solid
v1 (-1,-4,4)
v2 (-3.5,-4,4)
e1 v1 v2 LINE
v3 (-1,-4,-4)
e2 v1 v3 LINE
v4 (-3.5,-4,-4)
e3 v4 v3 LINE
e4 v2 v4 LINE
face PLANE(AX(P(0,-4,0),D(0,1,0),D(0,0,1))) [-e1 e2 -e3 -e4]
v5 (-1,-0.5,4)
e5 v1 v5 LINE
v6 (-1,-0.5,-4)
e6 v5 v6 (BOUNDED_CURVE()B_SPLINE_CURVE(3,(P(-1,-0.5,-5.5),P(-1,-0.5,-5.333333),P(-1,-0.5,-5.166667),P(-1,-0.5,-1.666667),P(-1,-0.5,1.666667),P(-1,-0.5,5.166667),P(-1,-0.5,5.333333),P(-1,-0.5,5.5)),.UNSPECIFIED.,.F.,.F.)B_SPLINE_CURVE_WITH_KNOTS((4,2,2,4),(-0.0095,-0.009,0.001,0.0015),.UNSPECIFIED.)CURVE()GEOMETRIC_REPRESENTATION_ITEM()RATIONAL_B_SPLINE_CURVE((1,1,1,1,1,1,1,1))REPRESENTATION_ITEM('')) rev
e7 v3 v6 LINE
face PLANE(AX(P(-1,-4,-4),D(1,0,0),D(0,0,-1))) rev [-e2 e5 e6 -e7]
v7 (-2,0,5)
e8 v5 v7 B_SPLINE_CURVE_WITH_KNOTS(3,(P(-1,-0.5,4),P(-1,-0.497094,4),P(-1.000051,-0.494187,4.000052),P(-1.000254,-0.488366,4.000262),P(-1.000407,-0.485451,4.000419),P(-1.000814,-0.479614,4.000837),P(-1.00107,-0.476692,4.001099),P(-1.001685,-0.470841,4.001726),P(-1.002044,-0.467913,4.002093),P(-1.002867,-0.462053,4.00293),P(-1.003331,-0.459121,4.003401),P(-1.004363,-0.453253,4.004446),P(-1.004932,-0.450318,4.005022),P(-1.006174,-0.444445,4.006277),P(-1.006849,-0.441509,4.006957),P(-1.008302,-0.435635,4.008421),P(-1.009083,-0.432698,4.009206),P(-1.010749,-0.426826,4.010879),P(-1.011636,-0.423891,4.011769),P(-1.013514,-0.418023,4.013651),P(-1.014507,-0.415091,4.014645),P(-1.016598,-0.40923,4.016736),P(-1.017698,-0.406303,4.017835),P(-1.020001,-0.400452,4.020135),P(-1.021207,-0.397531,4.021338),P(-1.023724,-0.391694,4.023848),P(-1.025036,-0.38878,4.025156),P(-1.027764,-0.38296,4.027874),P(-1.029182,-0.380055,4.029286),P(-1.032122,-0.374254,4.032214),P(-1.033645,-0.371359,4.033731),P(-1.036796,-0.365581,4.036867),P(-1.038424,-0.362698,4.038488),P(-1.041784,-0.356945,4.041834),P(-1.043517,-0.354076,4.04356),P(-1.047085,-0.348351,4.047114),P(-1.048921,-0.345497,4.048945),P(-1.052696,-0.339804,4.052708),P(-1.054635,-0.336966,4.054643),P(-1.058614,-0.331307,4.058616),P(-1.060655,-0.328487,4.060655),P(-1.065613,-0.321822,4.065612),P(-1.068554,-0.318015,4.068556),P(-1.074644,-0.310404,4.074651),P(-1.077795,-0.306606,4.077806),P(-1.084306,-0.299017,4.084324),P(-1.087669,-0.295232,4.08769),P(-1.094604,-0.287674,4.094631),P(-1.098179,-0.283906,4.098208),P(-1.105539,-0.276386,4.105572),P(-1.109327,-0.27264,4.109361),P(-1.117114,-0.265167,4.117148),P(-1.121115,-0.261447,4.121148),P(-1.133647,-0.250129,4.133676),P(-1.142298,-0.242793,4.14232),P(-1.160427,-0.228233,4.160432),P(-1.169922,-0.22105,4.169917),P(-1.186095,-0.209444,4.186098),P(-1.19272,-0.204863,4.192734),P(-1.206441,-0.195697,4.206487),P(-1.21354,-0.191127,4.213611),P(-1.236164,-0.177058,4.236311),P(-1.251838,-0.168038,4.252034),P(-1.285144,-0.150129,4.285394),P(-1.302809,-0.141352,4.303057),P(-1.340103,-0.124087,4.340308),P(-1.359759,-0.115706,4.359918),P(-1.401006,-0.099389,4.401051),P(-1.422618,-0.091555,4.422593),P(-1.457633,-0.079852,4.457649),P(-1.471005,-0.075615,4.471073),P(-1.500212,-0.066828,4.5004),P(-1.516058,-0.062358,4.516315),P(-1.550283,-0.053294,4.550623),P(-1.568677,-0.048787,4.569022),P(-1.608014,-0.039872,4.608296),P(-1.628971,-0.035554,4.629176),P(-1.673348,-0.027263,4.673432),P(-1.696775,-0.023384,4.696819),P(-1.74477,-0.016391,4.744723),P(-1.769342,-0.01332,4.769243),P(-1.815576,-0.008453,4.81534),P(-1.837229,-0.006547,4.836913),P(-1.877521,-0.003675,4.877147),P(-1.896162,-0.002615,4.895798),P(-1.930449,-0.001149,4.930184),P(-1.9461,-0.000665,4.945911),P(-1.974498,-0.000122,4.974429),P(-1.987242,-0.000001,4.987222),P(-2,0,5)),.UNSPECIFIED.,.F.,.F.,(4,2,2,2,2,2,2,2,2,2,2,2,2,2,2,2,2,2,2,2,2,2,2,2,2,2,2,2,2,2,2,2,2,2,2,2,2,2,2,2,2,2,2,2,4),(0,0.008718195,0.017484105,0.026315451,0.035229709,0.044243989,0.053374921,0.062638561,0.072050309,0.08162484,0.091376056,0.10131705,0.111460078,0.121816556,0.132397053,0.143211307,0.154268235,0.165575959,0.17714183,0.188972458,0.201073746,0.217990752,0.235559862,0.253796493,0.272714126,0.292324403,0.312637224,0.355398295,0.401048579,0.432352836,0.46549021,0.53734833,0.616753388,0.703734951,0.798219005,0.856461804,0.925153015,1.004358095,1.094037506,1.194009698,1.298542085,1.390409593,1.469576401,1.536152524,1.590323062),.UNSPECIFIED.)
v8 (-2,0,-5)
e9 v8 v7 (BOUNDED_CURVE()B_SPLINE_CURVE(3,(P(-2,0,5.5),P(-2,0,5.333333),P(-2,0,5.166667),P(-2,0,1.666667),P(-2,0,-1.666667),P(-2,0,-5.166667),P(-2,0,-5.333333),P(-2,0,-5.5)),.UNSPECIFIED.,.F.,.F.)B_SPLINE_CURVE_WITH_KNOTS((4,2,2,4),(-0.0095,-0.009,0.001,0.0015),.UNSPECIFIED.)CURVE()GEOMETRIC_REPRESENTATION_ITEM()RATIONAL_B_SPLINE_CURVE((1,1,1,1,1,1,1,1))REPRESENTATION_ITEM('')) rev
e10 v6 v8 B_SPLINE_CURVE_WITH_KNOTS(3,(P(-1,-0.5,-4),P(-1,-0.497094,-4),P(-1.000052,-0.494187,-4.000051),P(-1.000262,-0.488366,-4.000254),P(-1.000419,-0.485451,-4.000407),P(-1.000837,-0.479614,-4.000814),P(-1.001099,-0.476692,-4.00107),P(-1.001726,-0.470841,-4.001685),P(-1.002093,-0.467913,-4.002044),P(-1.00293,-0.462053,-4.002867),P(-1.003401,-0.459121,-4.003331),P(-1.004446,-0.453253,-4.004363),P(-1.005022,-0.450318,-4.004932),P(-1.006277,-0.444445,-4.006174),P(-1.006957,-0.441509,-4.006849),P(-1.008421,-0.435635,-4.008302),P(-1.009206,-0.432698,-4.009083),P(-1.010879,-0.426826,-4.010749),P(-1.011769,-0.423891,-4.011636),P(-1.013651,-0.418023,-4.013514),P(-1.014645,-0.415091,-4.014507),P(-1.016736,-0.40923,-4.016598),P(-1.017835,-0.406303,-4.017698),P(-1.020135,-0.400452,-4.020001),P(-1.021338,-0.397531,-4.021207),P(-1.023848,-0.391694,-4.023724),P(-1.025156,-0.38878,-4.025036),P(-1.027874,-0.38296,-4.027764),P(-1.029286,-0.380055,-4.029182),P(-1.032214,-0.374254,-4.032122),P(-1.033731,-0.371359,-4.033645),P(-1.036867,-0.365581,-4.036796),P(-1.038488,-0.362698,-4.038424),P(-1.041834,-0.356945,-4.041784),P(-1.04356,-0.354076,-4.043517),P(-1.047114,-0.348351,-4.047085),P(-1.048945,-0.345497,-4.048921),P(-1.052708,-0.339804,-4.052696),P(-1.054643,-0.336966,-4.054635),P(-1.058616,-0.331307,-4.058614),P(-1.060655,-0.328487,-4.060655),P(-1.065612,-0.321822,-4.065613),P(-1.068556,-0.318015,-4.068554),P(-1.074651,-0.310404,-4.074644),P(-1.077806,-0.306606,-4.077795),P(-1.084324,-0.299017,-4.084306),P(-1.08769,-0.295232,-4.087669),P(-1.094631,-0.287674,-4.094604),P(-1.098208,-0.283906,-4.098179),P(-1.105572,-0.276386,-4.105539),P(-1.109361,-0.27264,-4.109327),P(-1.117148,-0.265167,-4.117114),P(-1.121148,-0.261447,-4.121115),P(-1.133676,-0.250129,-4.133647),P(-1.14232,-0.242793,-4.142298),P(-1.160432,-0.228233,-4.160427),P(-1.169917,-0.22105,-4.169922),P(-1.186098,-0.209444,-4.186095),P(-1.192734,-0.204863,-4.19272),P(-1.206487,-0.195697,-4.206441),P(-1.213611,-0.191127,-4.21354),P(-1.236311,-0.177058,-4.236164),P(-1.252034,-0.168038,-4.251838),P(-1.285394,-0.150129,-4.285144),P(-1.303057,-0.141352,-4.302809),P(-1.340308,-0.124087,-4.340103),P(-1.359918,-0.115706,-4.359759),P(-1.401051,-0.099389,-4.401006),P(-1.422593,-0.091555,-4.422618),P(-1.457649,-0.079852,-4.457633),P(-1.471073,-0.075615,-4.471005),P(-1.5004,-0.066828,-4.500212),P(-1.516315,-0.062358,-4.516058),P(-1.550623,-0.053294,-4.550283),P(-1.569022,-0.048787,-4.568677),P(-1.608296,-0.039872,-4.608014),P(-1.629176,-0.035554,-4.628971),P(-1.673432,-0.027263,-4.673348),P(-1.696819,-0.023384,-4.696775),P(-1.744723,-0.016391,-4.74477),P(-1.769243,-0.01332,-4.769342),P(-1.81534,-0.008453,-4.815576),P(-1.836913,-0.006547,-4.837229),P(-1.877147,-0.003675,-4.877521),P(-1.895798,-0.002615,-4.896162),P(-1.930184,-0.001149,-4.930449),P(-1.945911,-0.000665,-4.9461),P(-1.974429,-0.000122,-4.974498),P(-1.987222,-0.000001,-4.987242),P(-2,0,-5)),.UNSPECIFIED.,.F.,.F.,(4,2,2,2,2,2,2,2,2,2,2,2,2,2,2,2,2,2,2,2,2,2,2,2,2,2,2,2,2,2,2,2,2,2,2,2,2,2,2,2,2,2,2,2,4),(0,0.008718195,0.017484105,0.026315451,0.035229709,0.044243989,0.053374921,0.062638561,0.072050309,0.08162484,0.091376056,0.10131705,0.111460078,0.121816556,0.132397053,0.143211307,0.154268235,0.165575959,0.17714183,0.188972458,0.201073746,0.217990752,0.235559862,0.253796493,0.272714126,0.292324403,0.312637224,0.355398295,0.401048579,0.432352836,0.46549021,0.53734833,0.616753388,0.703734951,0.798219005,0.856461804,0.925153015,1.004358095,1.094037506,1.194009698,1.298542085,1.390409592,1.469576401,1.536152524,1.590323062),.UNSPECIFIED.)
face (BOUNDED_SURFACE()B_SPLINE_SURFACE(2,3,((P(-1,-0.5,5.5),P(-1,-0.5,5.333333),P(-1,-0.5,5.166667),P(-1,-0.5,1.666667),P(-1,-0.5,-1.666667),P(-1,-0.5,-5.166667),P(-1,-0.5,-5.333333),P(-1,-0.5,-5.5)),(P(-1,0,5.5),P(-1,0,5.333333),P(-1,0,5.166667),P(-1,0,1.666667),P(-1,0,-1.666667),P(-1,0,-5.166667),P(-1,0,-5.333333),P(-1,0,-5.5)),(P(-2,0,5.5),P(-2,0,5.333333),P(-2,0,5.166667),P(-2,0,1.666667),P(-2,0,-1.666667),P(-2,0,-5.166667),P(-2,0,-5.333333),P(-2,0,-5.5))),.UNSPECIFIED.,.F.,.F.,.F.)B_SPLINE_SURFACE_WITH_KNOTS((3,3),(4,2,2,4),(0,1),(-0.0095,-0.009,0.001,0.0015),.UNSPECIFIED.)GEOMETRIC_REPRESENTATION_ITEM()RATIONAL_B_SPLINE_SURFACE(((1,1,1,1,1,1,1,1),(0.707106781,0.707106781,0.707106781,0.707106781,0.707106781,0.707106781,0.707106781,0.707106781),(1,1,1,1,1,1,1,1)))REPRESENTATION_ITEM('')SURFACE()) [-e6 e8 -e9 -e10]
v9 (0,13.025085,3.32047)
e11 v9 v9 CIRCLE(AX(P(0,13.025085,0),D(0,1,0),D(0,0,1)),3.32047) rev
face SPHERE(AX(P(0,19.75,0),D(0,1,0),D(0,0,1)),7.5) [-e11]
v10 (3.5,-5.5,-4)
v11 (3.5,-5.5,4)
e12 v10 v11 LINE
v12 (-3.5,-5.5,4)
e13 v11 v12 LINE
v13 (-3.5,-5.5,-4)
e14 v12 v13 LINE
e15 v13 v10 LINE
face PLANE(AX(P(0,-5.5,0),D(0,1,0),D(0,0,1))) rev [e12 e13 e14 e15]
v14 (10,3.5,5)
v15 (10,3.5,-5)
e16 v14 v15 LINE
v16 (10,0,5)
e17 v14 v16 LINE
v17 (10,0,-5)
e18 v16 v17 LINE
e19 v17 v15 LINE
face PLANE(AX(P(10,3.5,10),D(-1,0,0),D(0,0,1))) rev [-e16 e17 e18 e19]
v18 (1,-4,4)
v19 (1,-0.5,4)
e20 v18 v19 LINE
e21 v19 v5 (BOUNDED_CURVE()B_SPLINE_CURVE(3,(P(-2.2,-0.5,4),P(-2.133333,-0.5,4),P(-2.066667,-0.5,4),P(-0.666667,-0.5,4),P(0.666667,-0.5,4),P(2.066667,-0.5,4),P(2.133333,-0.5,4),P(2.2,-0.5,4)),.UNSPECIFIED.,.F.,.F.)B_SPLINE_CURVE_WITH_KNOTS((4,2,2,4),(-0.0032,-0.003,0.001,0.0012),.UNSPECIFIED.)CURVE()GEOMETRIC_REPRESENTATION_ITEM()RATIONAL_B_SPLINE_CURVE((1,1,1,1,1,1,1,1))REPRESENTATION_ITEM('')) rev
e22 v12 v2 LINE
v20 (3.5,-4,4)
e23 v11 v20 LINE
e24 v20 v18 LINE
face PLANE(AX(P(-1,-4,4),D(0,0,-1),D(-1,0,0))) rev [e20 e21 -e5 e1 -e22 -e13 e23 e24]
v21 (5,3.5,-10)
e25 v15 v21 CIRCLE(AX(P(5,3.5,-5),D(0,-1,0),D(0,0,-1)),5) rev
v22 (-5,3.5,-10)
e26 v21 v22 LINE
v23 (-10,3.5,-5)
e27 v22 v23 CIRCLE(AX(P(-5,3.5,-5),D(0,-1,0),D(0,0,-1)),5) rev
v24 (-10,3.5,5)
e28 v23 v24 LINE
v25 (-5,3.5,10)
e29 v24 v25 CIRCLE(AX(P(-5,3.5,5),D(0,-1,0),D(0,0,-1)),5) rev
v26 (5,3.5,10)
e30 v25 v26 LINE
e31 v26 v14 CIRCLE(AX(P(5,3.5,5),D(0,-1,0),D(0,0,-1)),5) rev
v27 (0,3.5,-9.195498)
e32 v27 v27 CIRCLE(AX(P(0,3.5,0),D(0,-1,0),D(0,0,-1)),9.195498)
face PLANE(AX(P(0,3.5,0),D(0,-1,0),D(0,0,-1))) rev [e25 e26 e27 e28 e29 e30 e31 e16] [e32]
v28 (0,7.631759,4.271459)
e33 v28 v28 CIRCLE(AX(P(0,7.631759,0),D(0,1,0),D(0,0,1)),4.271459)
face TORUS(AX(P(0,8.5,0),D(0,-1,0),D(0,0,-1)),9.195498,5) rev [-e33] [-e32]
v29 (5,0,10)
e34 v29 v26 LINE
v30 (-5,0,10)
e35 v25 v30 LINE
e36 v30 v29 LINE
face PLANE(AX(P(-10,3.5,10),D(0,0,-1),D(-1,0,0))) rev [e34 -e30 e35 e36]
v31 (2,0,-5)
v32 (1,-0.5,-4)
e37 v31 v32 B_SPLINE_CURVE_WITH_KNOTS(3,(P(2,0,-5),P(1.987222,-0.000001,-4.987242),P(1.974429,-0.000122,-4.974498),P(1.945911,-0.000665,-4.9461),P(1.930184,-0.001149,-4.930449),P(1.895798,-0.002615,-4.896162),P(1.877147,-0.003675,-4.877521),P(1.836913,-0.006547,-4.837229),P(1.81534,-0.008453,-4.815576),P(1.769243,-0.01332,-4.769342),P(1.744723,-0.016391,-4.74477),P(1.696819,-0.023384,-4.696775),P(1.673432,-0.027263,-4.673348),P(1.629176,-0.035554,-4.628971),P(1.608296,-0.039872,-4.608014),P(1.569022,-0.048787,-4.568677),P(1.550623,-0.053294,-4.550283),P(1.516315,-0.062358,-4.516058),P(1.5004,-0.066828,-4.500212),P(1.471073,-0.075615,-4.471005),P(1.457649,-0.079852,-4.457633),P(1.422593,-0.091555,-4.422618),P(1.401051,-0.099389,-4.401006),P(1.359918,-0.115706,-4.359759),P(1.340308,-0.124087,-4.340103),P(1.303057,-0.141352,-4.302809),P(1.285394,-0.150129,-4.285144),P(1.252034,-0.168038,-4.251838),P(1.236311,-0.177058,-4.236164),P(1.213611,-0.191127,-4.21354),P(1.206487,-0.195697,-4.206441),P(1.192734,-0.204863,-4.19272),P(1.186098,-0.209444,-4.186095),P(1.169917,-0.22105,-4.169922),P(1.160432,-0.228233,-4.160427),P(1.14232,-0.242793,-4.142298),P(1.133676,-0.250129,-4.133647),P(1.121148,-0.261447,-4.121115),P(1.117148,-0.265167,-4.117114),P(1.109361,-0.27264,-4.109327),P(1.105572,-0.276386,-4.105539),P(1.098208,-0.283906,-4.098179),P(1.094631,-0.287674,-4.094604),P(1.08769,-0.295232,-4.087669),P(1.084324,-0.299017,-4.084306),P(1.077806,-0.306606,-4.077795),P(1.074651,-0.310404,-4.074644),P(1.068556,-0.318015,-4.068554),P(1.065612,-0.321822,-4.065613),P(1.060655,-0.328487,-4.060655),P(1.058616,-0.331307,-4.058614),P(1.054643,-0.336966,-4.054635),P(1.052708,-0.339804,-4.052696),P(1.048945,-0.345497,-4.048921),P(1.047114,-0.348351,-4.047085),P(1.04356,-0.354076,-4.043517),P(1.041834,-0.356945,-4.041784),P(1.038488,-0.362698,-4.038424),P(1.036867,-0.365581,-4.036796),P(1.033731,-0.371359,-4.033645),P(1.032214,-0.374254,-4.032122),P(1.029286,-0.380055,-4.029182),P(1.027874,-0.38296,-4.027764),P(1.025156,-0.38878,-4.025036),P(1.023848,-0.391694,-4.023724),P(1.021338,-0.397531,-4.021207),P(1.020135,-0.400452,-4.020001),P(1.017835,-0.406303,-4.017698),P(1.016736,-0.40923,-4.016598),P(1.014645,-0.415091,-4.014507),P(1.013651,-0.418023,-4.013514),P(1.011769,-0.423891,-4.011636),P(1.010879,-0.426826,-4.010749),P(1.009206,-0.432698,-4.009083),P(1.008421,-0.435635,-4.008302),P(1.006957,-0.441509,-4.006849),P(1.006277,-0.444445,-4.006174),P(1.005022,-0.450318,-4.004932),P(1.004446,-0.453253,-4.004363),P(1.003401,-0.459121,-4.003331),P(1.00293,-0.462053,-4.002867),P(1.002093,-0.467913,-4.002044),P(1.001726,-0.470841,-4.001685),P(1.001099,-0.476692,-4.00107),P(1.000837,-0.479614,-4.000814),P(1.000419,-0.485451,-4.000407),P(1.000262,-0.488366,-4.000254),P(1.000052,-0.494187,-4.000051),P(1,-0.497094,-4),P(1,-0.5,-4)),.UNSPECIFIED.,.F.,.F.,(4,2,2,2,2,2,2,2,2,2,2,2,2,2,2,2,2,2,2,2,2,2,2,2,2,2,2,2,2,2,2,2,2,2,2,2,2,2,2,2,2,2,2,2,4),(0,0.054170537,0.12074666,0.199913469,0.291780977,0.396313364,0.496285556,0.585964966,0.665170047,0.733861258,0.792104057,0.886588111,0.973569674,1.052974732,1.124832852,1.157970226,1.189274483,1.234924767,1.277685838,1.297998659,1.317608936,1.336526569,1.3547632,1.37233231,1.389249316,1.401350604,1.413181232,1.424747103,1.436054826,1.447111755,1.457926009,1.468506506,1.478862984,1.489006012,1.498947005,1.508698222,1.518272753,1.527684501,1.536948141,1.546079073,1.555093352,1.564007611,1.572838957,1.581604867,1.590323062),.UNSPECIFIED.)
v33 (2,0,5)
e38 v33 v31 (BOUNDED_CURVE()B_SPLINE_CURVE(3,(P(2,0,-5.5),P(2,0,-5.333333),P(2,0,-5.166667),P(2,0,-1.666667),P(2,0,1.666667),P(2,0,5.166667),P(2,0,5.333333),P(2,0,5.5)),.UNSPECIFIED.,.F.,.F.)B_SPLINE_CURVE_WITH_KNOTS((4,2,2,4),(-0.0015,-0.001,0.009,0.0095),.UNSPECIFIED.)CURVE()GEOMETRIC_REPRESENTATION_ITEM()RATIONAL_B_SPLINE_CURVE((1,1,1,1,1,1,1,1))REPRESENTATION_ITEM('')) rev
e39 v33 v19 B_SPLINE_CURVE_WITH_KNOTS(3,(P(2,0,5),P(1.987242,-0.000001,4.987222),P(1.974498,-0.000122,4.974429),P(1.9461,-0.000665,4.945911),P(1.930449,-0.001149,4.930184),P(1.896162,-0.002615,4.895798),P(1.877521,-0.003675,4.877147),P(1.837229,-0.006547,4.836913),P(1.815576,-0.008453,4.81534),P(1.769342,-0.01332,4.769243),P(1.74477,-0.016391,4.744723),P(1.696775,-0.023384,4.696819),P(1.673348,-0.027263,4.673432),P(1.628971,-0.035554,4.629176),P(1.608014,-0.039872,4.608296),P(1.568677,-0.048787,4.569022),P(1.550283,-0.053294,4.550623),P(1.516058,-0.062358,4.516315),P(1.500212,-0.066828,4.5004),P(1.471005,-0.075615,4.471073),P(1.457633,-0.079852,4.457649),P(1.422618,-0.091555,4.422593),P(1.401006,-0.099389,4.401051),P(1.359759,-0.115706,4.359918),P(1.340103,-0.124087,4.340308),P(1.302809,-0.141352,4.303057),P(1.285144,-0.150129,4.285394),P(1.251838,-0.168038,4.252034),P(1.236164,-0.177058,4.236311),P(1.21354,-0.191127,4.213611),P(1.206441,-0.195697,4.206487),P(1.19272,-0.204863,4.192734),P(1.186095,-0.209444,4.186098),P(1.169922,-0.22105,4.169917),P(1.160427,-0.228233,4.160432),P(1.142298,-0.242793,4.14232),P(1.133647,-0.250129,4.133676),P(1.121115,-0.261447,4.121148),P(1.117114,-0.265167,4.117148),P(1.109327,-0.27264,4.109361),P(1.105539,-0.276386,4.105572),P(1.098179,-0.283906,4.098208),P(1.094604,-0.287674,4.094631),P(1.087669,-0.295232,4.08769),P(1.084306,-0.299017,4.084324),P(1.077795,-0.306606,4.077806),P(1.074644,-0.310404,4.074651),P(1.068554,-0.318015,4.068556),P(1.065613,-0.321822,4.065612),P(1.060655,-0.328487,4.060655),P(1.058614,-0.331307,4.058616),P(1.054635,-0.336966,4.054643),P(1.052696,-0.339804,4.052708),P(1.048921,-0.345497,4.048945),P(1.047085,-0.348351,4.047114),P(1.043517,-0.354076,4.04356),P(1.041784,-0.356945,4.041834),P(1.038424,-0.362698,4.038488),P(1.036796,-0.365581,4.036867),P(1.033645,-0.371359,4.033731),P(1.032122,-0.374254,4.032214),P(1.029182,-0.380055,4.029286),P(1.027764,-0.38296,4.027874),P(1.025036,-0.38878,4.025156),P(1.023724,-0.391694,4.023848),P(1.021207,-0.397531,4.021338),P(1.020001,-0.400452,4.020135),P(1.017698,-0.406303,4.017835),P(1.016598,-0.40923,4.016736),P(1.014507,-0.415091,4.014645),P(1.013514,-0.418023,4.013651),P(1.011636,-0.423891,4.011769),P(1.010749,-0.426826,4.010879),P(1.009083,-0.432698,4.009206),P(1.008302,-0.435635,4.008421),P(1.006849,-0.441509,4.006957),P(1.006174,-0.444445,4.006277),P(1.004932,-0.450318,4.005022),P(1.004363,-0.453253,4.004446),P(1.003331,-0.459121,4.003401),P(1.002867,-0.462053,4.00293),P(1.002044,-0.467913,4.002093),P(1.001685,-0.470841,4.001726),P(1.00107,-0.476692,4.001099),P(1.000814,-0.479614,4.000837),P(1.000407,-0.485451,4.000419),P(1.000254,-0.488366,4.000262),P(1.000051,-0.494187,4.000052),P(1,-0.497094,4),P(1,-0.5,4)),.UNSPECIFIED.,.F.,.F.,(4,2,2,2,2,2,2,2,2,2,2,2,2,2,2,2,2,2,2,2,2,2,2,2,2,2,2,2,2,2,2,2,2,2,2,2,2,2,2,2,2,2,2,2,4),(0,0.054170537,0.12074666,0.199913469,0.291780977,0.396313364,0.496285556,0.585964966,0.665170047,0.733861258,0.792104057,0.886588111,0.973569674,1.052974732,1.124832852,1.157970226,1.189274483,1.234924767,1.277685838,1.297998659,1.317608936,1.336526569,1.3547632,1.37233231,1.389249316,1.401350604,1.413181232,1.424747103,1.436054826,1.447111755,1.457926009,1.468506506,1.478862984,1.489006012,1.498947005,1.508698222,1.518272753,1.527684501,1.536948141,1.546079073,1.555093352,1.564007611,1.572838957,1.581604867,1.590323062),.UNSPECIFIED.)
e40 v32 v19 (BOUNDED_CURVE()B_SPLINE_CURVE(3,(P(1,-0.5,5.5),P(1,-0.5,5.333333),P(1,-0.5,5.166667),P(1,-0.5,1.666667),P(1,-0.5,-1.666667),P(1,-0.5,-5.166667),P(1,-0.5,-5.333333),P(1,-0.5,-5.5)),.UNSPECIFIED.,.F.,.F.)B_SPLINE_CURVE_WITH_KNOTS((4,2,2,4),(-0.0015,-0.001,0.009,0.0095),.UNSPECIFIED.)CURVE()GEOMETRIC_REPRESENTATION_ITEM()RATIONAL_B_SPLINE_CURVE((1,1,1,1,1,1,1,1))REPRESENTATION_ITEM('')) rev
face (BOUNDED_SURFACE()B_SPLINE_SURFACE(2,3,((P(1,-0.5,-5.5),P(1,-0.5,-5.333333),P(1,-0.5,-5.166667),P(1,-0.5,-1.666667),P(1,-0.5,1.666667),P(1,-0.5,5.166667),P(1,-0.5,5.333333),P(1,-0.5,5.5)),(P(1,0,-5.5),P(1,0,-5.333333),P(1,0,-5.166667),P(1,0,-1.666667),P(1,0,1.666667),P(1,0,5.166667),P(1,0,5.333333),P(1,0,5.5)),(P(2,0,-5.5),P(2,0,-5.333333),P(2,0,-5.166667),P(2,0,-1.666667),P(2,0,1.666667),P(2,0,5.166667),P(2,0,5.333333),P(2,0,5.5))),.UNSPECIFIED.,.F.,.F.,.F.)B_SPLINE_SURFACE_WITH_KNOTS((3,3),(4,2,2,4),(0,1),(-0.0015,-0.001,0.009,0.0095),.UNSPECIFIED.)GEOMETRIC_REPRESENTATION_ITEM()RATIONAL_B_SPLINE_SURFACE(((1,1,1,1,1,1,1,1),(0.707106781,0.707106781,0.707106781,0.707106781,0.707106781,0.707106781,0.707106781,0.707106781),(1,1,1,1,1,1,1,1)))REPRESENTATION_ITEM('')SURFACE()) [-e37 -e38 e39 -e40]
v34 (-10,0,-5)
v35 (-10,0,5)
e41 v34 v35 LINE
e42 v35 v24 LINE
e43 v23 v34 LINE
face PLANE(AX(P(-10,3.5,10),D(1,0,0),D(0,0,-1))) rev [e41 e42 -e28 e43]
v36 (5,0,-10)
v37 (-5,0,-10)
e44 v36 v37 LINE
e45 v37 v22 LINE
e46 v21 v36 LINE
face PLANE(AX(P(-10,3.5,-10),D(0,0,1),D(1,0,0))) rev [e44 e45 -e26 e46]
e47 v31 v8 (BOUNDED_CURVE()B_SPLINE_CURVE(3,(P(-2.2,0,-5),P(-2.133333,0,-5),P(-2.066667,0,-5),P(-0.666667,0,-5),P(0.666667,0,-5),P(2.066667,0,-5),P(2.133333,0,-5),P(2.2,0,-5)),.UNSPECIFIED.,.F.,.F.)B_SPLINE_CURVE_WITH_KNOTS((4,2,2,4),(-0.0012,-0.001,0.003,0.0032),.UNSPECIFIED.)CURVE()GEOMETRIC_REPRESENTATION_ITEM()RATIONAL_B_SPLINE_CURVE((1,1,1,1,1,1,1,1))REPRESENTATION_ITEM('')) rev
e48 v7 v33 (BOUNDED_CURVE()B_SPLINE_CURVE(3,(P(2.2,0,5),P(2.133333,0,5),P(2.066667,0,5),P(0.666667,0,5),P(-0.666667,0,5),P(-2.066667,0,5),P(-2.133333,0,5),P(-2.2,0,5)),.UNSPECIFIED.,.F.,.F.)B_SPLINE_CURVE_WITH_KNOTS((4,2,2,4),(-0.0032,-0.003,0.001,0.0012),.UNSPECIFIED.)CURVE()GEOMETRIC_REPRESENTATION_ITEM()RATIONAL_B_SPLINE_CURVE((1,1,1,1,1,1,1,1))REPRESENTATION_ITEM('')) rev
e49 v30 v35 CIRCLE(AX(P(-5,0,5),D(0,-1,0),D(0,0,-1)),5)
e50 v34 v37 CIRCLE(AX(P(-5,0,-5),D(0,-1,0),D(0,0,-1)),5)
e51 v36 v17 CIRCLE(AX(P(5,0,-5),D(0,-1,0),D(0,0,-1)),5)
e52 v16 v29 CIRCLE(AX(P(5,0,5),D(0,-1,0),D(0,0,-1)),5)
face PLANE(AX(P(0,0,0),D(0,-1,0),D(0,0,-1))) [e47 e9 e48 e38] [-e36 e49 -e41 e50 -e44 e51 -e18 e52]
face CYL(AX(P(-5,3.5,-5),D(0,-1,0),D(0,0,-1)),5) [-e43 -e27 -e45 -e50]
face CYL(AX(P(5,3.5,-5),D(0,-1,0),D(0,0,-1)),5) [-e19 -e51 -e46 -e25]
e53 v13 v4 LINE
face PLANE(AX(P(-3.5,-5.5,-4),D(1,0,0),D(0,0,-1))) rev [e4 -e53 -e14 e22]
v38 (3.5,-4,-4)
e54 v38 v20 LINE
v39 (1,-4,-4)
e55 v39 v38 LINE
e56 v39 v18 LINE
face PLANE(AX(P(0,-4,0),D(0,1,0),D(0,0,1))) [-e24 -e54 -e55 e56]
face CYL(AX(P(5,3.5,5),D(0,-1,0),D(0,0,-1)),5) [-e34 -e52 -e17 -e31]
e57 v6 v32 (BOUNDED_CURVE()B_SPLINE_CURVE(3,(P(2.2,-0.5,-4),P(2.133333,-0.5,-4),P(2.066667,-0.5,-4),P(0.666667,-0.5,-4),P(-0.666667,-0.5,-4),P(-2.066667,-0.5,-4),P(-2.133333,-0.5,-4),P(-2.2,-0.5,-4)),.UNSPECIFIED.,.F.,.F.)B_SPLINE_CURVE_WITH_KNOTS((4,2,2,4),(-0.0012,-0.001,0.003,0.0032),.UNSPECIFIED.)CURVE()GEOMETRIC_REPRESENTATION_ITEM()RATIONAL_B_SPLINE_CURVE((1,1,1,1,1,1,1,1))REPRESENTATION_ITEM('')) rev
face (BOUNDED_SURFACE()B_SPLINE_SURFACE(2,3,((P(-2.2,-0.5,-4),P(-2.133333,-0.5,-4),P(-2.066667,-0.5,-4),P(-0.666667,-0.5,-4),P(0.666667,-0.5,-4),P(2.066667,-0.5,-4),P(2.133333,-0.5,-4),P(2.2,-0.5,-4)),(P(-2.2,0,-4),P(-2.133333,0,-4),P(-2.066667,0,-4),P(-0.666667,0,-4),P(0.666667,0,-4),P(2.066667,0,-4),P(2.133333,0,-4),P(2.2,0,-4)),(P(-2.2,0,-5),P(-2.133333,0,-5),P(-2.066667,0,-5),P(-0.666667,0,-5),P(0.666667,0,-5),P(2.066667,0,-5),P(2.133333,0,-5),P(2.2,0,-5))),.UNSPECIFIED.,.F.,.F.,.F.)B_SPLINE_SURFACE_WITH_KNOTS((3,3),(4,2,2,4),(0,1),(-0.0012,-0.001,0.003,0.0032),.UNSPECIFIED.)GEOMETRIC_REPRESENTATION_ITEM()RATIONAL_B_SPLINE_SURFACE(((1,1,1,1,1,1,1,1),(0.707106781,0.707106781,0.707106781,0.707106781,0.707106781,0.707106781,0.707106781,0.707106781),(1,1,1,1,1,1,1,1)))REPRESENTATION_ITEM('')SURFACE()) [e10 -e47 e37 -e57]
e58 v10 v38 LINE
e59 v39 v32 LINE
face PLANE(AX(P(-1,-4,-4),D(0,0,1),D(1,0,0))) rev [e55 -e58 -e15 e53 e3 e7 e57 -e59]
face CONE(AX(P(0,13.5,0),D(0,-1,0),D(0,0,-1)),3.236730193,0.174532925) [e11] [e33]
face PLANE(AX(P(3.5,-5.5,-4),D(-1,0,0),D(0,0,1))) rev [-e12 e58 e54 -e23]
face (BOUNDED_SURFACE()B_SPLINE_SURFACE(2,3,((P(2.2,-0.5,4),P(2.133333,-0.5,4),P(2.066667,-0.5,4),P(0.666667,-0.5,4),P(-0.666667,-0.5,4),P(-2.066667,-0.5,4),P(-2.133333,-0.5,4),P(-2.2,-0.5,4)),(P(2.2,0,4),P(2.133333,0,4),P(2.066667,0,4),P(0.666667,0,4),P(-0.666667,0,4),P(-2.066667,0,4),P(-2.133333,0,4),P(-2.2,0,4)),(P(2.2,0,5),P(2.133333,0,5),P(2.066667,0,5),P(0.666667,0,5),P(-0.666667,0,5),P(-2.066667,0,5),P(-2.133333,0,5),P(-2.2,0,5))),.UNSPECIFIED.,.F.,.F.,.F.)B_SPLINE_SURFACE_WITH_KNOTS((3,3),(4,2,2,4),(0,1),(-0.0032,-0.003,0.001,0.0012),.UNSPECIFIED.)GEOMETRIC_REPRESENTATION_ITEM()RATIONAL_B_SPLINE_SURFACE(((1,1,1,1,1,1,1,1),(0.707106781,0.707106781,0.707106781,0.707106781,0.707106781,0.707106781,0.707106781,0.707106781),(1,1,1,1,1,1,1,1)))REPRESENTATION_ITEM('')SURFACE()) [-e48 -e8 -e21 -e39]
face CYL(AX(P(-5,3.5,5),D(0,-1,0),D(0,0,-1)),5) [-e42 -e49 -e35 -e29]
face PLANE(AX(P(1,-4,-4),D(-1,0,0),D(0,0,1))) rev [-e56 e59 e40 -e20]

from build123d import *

# Parameters (mm, degrees)
SKETCH1_W           = 20
SKETCH1_H           = 20
BOSS_EXTRUDE1_DEPTH = 3.5
SKETCH2_R           = 5
BOSS_EXTRUDE2_DEPTH = 10
CHAMFER1_SIZE       = 10
CHAMFER1_SIZE_2     = 1.763269807
FILLET1_R           = 5
FILLET2_R           = 5
SKETCH9_W           = 2
SKETCH9_H           = 8
BOSS_EXTRUDE4_DEPTH = 4
SKETCH10_W          = 7
SKETCH10_H          = 8
BOSS_EXTRUDE5_DEPTH = 1.5
FILLET3_SIZE        = 0.5
FILLET3_SIZE_2      = 1


# Read off the part's stored shape, not the designer's step: Revolve5
with BuildPart() as part:
    # Sketch1 → Boss-Extrude1 (new body)
    with BuildSketch(Plane(origin=(0, 0, 0), x_dir=(1, 0, 0), z_dir=(0, 1, 0))):
        Rectangle(SKETCH1_W, SKETCH1_H)
    extrude(amount=BOSS_EXTRUDE1_DEPTH)

    # Sketch2 → Boss-Extrude2 (add)
    with BuildSketch(Plane(origin=(0, 3.5, 0), x_dir=(1, 0, 0), z_dir=(0, 1, 0))):
        with Locations(Location((0, 0, 0), (0, 0, 270))):
            Circle(SKETCH2_R)
    extrude(amount=BOSS_EXTRUDE2_DEPTH)

    # Chamfer1
    # the kernel refuses this chamfer: 10, 1.763269807 mm, written as the material it takes off along each edge
    with BuildSketch(Plane(origin=(0, 13.5, 0), x_dir=(0, 0, 1), z_dir=(-1, 0, 0))) as chamfer1_piece_1_section:
        Polygon((5, -CHAMFER1_SIZE), (5 - CHAMFER1_SIZE_2, 0), (5, 0), align=None)
    chamfer1_piece_1 = revolve(axis=Axis((0, 13.5, 0), (0, 1, 0)), mode=Mode.PRIVATE)
    chamfer1_piece_1 = split(chamfer1_piece_1, bisect_by=Plane(origin=(0, 3.5, -4.151256053), z_dir=(0, 1, 0)), keep=Keep.TOP, mode=Mode.PRIVATE)
    add(chamfer1_piece_1, mode=Mode.SUBTRACT)

    # Fillet1
    fillet1_edges = [part.edges().sort_by_distance(p)[0] for p in [
        (10, 1.75, 10),
        (-10, 1.75, 10),
        (-10, 1.75, -10),
        (10, 1.75, -10),
    ]]
    fillet(fillet1_edges, radius=FILLET1_R)

    # Revolve5 outline → Revolve5 (revolve)
    with BuildSketch(Plane.XY):
        with BuildLine():
            ThreePointArc((3.320470439, 13.025085423), (7.303658649, 21.454866662), (0, 27.25))
            Line((0, 27.25), (0, 13.5))
            Line((0, 13.5), (3.236730193, 13.5))
            Line((3.236730193, 13.5), (3.236730193, 13.025085423))
            Line((3.236730193, 13.025085423), (3.320470439, 13.025085423))
        make_face()
    revolve(axis=Axis((0, 0, 0), (0, 1, 0)))

    # Fillet2
    fillet2_edges = [part.edges().sort_by_distance(p)[0] for p in [
        (0, 3.5, -5),
    ]]
    fillet(fillet2_edges, radius=FILLET2_R)

    # Sketch9 → Boss-Extrude4 (add)
    with BuildSketch(Plane.XZ):
        Rectangle(SKETCH9_W, SKETCH9_H)
    extrude(amount=BOSS_EXTRUDE4_DEPTH)

    # Sketch10 → Boss-Extrude5 (add)
    with BuildSketch(Plane(origin=(0, -4, 0), x_dir=(-1, 0, 0), z_dir=(0, -1, 0))):
        Rectangle(SKETCH10_W, SKETCH10_H)
    extrude(amount=BOSS_EXTRUDE5_DEPTH)

    # Fillet3
    # an asymmetric fillet: 1, 0.5 mm, written as the material it adds along each edge
    with BuildSketch(Plane(origin=(1, 0, -4), x_dir=(0, -1, 0), z_dir=(0, 0, 1)), Plane(origin=(-1, 0, 4), x_dir=(0, -1, 0), z_dir=(0, 0, -1))) as fillet3_piece_1:
        with BuildLine():
            Bezier((FILLET3_SIZE, 0), (0, 0), (0, FILLET3_SIZE_2), weights=[1, 0.707106781, 1])
            Line((0, FILLET3_SIZE_2), (0, 0))
            Line((0, 0), (FILLET3_SIZE, 0))
        make_face()
    extrude(amount=8)
    with BuildSketch(Plane(origin=(1, 0, 4), x_dir=(0, -1, 0), z_dir=(-1, 0, 0)), Plane(origin=(-1, 0, -4), x_dir=(0, -1, 0), z_dir=(1, 0, 0))) as fillet3_piece_2:
        with BuildLine():
            Bezier((FILLET3_SIZE, 0), (0, 0), (0, FILLET3_SIZE_2), weights=[1, 0.707106781, 1])
            Line((0, FILLET3_SIZE_2), (0, 0))
            Line((0, 0), (FILLET3_SIZE, 0))
        make_face()
    extrude(amount=2)
    with BuildSketch(Plane(origin=(-1, 0, -4), x_dir=(0, -1, 0), z_dir=(1, 0, 0))) as fillet3_piece_3a_section:
        with BuildLine():
            Bezier((FILLET3_SIZE, 0), (0, 0), (0, FILLET3_SIZE_2), weights=[1, 0.707106781, 1])
            Line((0, FILLET3_SIZE_2), (0, 0))
            Line((0, 0), (FILLET3_SIZE, 0))
        make_face()
    fillet3_piece_3a = extrude(amount=4.5, mode=Mode.PRIVATE)
    fillet3_piece_3a = split(fillet3_piece_3a, bisect_by=Plane(origin=(1, -0.103701438, -4.24592111), z_dir=(1, 0, 0)), keep=Keep.TOP, mode=Mode.PRIVATE)
    with BuildSketch(Plane(origin=(1, 0, -6.5), x_dir=(0, -1, 0), z_dir=(0, 0, 1))) as fillet3_piece_3b_section:
        with BuildLine():
            Bezier((FILLET3_SIZE, 0), (0, 0), (0, FILLET3_SIZE_2), weights=[1, 0.707106781, 1])
            Line((0, FILLET3_SIZE_2), (0, 0))
            Line((0, 0), (FILLET3_SIZE, 0))
        make_face()
    fillet3_piece_3b = extrude(amount=10.5, mode=Mode.PRIVATE)
    fillet3_piece_3b = split(fillet3_piece_3b, bisect_by=Plane(origin=(1.245921261, -0.103701518, -4), z_dir=(0, 0, -1)), keep=Keep.TOP, mode=Mode.PRIVATE)
    fillet3_piece_3 = fillet3_piece_3a & fillet3_piece_3b
    add(fillet3_piece_3)
    with BuildSketch(Plane(origin=(3.5, 0, 4), x_dir=(0, -1, 0), z_dir=(-1, 0, 0))) as fillet3_piece_4a_section:
        with BuildLine():
            Bezier((FILLET3_SIZE, 0), (0, 0), (0, FILLET3_SIZE_2), weights=[1, 0.707106781, 1])
            Line((0, FILLET3_SIZE_2), (0, 0))
            Line((0, 0), (FILLET3_SIZE, 0))
        make_face()
    fillet3_piece_4a = extrude(amount=4.5, mode=Mode.PRIVATE)
    fillet3_piece_4a = split(fillet3_piece_4a, bisect_by=Plane(origin=(1, -0.103701518, 4.245921261), z_dir=(1, 0, 0)), keep=Keep.TOP, mode=Mode.PRIVATE)
    with BuildSketch(Plane(origin=(1, 0, -4), x_dir=(0, -1, 0), z_dir=(0, 0, 1))) as fillet3_piece_4b_section:
        with BuildLine():
            Bezier((FILLET3_SIZE, 0), (0, 0), (0, FILLET3_SIZE_2), weights=[1, 0.707106781, 1])
            Line((0, FILLET3_SIZE_2), (0, 0))
            Line((0, 0), (FILLET3_SIZE, 0))
        make_face()
    fillet3_piece_4b = extrude(amount=10.5, mode=Mode.PRIVATE)
    fillet3_piece_4b = split(fillet3_piece_4b, bisect_by=Plane(origin=(1.24592111, -0.103701438, 4), z_dir=(0, 0, 1)), keep=Keep.TOP, mode=Mode.PRIVATE)
    fillet3_piece_4 = fillet3_piece_4a & fillet3_piece_4b
    add(fillet3_piece_4)
    with BuildSketch(Plane(origin=(1, 0, 4), x_dir=(0, -1, 0), z_dir=(-1, 0, 0))) as fillet3_piece_5a_section:
        with BuildLine():
            Bezier((FILLET3_SIZE, 0), (0, 0), (0, FILLET3_SIZE_2), weights=[1, 0.707106781, 1])
            Line((0, FILLET3_SIZE_2), (0, 0))
            Line((0, 0), (FILLET3_SIZE, 0))
        make_face()
    fillet3_piece_5a = extrude(amount=4.5, mode=Mode.PRIVATE)
    fillet3_piece_5a = split(fillet3_piece_5a, bisect_by=Plane(origin=(-1, -0.103701438, 4.24592111), z_dir=(-1, 0, 0)), keep=Keep.TOP, mode=Mode.PRIVATE)
    with BuildSketch(Plane(origin=(-1, 0, 6.5), x_dir=(0, -1, 0), z_dir=(0, 0, -1))) as fillet3_piece_5b_section:
        with BuildLine():
            Bezier((FILLET3_SIZE, 0), (0, 0), (0, FILLET3_SIZE_2), weights=[1, 0.707106781, 1])
            Line((0, FILLET3_SIZE_2), (0, 0))
            Line((0, 0), (FILLET3_SIZE, 0))
        make_face()
    fillet3_piece_5b = extrude(amount=10.5, mode=Mode.PRIVATE)
    fillet3_piece_5b = split(fillet3_piece_5b, bisect_by=Plane(origin=(-1.245921261, -0.103701518, 4), z_dir=(0, 0, 1)), keep=Keep.TOP, mode=Mode.PRIVATE)
    fillet3_piece_5 = fillet3_piece_5a & fillet3_piece_5b
    add(fillet3_piece_5)
    with BuildSketch(Plane(origin=(-3.5, 0, -4), x_dir=(0, -1, 0), z_dir=(1, 0, 0))) as fillet3_piece_6a_section:
        with BuildLine():
            Bezier((FILLET3_SIZE, 0), (0, 0), (0, FILLET3_SIZE_2), weights=[1, 0.707106781, 1])
            Line((0, FILLET3_SIZE_2), (0, 0))
            Line((0, 0), (FILLET3_SIZE, 0))
        make_face()
    fillet3_piece_6a = extrude(amount=4.5, mode=Mode.PRIVATE)
    fillet3_piece_6a = split(fillet3_piece_6a, bisect_by=Plane(origin=(-1, -0.103701518, -4.245921261), z_dir=(-1, 0, 0)), keep=Keep.TOP, mode=Mode.PRIVATE)
    with BuildSketch(Plane(origin=(-1, 0, 4), x_dir=(0, -1, 0), z_dir=(0, 0, -1))) as fillet3_piece_6b_section:
        with BuildLine():
            Bezier((FILLET3_SIZE, 0), (0, 0), (0, FILLET3_SIZE_2), weights=[1, 0.707106781, 1])
            Line((0, FILLET3_SIZE_2), (0, 0))
            Line((0, 0), (FILLET3_SIZE, 0))
        make_face()
    fillet3_piece_6b = extrude(amount=10.5, mode=Mode.PRIVATE)
    fillet3_piece_6b = split(fillet3_piece_6b, bisect_by=Plane(origin=(-1.24592111, -0.103701438, -4), z_dir=(0, 0, -1)), keep=Keep.TOP, mode=Mode.PRIVATE)
    fillet3_piece_6 = fillet3_piece_6a & fillet3_piece_6b
    add(fillet3_piece_6)


solid = part.part
